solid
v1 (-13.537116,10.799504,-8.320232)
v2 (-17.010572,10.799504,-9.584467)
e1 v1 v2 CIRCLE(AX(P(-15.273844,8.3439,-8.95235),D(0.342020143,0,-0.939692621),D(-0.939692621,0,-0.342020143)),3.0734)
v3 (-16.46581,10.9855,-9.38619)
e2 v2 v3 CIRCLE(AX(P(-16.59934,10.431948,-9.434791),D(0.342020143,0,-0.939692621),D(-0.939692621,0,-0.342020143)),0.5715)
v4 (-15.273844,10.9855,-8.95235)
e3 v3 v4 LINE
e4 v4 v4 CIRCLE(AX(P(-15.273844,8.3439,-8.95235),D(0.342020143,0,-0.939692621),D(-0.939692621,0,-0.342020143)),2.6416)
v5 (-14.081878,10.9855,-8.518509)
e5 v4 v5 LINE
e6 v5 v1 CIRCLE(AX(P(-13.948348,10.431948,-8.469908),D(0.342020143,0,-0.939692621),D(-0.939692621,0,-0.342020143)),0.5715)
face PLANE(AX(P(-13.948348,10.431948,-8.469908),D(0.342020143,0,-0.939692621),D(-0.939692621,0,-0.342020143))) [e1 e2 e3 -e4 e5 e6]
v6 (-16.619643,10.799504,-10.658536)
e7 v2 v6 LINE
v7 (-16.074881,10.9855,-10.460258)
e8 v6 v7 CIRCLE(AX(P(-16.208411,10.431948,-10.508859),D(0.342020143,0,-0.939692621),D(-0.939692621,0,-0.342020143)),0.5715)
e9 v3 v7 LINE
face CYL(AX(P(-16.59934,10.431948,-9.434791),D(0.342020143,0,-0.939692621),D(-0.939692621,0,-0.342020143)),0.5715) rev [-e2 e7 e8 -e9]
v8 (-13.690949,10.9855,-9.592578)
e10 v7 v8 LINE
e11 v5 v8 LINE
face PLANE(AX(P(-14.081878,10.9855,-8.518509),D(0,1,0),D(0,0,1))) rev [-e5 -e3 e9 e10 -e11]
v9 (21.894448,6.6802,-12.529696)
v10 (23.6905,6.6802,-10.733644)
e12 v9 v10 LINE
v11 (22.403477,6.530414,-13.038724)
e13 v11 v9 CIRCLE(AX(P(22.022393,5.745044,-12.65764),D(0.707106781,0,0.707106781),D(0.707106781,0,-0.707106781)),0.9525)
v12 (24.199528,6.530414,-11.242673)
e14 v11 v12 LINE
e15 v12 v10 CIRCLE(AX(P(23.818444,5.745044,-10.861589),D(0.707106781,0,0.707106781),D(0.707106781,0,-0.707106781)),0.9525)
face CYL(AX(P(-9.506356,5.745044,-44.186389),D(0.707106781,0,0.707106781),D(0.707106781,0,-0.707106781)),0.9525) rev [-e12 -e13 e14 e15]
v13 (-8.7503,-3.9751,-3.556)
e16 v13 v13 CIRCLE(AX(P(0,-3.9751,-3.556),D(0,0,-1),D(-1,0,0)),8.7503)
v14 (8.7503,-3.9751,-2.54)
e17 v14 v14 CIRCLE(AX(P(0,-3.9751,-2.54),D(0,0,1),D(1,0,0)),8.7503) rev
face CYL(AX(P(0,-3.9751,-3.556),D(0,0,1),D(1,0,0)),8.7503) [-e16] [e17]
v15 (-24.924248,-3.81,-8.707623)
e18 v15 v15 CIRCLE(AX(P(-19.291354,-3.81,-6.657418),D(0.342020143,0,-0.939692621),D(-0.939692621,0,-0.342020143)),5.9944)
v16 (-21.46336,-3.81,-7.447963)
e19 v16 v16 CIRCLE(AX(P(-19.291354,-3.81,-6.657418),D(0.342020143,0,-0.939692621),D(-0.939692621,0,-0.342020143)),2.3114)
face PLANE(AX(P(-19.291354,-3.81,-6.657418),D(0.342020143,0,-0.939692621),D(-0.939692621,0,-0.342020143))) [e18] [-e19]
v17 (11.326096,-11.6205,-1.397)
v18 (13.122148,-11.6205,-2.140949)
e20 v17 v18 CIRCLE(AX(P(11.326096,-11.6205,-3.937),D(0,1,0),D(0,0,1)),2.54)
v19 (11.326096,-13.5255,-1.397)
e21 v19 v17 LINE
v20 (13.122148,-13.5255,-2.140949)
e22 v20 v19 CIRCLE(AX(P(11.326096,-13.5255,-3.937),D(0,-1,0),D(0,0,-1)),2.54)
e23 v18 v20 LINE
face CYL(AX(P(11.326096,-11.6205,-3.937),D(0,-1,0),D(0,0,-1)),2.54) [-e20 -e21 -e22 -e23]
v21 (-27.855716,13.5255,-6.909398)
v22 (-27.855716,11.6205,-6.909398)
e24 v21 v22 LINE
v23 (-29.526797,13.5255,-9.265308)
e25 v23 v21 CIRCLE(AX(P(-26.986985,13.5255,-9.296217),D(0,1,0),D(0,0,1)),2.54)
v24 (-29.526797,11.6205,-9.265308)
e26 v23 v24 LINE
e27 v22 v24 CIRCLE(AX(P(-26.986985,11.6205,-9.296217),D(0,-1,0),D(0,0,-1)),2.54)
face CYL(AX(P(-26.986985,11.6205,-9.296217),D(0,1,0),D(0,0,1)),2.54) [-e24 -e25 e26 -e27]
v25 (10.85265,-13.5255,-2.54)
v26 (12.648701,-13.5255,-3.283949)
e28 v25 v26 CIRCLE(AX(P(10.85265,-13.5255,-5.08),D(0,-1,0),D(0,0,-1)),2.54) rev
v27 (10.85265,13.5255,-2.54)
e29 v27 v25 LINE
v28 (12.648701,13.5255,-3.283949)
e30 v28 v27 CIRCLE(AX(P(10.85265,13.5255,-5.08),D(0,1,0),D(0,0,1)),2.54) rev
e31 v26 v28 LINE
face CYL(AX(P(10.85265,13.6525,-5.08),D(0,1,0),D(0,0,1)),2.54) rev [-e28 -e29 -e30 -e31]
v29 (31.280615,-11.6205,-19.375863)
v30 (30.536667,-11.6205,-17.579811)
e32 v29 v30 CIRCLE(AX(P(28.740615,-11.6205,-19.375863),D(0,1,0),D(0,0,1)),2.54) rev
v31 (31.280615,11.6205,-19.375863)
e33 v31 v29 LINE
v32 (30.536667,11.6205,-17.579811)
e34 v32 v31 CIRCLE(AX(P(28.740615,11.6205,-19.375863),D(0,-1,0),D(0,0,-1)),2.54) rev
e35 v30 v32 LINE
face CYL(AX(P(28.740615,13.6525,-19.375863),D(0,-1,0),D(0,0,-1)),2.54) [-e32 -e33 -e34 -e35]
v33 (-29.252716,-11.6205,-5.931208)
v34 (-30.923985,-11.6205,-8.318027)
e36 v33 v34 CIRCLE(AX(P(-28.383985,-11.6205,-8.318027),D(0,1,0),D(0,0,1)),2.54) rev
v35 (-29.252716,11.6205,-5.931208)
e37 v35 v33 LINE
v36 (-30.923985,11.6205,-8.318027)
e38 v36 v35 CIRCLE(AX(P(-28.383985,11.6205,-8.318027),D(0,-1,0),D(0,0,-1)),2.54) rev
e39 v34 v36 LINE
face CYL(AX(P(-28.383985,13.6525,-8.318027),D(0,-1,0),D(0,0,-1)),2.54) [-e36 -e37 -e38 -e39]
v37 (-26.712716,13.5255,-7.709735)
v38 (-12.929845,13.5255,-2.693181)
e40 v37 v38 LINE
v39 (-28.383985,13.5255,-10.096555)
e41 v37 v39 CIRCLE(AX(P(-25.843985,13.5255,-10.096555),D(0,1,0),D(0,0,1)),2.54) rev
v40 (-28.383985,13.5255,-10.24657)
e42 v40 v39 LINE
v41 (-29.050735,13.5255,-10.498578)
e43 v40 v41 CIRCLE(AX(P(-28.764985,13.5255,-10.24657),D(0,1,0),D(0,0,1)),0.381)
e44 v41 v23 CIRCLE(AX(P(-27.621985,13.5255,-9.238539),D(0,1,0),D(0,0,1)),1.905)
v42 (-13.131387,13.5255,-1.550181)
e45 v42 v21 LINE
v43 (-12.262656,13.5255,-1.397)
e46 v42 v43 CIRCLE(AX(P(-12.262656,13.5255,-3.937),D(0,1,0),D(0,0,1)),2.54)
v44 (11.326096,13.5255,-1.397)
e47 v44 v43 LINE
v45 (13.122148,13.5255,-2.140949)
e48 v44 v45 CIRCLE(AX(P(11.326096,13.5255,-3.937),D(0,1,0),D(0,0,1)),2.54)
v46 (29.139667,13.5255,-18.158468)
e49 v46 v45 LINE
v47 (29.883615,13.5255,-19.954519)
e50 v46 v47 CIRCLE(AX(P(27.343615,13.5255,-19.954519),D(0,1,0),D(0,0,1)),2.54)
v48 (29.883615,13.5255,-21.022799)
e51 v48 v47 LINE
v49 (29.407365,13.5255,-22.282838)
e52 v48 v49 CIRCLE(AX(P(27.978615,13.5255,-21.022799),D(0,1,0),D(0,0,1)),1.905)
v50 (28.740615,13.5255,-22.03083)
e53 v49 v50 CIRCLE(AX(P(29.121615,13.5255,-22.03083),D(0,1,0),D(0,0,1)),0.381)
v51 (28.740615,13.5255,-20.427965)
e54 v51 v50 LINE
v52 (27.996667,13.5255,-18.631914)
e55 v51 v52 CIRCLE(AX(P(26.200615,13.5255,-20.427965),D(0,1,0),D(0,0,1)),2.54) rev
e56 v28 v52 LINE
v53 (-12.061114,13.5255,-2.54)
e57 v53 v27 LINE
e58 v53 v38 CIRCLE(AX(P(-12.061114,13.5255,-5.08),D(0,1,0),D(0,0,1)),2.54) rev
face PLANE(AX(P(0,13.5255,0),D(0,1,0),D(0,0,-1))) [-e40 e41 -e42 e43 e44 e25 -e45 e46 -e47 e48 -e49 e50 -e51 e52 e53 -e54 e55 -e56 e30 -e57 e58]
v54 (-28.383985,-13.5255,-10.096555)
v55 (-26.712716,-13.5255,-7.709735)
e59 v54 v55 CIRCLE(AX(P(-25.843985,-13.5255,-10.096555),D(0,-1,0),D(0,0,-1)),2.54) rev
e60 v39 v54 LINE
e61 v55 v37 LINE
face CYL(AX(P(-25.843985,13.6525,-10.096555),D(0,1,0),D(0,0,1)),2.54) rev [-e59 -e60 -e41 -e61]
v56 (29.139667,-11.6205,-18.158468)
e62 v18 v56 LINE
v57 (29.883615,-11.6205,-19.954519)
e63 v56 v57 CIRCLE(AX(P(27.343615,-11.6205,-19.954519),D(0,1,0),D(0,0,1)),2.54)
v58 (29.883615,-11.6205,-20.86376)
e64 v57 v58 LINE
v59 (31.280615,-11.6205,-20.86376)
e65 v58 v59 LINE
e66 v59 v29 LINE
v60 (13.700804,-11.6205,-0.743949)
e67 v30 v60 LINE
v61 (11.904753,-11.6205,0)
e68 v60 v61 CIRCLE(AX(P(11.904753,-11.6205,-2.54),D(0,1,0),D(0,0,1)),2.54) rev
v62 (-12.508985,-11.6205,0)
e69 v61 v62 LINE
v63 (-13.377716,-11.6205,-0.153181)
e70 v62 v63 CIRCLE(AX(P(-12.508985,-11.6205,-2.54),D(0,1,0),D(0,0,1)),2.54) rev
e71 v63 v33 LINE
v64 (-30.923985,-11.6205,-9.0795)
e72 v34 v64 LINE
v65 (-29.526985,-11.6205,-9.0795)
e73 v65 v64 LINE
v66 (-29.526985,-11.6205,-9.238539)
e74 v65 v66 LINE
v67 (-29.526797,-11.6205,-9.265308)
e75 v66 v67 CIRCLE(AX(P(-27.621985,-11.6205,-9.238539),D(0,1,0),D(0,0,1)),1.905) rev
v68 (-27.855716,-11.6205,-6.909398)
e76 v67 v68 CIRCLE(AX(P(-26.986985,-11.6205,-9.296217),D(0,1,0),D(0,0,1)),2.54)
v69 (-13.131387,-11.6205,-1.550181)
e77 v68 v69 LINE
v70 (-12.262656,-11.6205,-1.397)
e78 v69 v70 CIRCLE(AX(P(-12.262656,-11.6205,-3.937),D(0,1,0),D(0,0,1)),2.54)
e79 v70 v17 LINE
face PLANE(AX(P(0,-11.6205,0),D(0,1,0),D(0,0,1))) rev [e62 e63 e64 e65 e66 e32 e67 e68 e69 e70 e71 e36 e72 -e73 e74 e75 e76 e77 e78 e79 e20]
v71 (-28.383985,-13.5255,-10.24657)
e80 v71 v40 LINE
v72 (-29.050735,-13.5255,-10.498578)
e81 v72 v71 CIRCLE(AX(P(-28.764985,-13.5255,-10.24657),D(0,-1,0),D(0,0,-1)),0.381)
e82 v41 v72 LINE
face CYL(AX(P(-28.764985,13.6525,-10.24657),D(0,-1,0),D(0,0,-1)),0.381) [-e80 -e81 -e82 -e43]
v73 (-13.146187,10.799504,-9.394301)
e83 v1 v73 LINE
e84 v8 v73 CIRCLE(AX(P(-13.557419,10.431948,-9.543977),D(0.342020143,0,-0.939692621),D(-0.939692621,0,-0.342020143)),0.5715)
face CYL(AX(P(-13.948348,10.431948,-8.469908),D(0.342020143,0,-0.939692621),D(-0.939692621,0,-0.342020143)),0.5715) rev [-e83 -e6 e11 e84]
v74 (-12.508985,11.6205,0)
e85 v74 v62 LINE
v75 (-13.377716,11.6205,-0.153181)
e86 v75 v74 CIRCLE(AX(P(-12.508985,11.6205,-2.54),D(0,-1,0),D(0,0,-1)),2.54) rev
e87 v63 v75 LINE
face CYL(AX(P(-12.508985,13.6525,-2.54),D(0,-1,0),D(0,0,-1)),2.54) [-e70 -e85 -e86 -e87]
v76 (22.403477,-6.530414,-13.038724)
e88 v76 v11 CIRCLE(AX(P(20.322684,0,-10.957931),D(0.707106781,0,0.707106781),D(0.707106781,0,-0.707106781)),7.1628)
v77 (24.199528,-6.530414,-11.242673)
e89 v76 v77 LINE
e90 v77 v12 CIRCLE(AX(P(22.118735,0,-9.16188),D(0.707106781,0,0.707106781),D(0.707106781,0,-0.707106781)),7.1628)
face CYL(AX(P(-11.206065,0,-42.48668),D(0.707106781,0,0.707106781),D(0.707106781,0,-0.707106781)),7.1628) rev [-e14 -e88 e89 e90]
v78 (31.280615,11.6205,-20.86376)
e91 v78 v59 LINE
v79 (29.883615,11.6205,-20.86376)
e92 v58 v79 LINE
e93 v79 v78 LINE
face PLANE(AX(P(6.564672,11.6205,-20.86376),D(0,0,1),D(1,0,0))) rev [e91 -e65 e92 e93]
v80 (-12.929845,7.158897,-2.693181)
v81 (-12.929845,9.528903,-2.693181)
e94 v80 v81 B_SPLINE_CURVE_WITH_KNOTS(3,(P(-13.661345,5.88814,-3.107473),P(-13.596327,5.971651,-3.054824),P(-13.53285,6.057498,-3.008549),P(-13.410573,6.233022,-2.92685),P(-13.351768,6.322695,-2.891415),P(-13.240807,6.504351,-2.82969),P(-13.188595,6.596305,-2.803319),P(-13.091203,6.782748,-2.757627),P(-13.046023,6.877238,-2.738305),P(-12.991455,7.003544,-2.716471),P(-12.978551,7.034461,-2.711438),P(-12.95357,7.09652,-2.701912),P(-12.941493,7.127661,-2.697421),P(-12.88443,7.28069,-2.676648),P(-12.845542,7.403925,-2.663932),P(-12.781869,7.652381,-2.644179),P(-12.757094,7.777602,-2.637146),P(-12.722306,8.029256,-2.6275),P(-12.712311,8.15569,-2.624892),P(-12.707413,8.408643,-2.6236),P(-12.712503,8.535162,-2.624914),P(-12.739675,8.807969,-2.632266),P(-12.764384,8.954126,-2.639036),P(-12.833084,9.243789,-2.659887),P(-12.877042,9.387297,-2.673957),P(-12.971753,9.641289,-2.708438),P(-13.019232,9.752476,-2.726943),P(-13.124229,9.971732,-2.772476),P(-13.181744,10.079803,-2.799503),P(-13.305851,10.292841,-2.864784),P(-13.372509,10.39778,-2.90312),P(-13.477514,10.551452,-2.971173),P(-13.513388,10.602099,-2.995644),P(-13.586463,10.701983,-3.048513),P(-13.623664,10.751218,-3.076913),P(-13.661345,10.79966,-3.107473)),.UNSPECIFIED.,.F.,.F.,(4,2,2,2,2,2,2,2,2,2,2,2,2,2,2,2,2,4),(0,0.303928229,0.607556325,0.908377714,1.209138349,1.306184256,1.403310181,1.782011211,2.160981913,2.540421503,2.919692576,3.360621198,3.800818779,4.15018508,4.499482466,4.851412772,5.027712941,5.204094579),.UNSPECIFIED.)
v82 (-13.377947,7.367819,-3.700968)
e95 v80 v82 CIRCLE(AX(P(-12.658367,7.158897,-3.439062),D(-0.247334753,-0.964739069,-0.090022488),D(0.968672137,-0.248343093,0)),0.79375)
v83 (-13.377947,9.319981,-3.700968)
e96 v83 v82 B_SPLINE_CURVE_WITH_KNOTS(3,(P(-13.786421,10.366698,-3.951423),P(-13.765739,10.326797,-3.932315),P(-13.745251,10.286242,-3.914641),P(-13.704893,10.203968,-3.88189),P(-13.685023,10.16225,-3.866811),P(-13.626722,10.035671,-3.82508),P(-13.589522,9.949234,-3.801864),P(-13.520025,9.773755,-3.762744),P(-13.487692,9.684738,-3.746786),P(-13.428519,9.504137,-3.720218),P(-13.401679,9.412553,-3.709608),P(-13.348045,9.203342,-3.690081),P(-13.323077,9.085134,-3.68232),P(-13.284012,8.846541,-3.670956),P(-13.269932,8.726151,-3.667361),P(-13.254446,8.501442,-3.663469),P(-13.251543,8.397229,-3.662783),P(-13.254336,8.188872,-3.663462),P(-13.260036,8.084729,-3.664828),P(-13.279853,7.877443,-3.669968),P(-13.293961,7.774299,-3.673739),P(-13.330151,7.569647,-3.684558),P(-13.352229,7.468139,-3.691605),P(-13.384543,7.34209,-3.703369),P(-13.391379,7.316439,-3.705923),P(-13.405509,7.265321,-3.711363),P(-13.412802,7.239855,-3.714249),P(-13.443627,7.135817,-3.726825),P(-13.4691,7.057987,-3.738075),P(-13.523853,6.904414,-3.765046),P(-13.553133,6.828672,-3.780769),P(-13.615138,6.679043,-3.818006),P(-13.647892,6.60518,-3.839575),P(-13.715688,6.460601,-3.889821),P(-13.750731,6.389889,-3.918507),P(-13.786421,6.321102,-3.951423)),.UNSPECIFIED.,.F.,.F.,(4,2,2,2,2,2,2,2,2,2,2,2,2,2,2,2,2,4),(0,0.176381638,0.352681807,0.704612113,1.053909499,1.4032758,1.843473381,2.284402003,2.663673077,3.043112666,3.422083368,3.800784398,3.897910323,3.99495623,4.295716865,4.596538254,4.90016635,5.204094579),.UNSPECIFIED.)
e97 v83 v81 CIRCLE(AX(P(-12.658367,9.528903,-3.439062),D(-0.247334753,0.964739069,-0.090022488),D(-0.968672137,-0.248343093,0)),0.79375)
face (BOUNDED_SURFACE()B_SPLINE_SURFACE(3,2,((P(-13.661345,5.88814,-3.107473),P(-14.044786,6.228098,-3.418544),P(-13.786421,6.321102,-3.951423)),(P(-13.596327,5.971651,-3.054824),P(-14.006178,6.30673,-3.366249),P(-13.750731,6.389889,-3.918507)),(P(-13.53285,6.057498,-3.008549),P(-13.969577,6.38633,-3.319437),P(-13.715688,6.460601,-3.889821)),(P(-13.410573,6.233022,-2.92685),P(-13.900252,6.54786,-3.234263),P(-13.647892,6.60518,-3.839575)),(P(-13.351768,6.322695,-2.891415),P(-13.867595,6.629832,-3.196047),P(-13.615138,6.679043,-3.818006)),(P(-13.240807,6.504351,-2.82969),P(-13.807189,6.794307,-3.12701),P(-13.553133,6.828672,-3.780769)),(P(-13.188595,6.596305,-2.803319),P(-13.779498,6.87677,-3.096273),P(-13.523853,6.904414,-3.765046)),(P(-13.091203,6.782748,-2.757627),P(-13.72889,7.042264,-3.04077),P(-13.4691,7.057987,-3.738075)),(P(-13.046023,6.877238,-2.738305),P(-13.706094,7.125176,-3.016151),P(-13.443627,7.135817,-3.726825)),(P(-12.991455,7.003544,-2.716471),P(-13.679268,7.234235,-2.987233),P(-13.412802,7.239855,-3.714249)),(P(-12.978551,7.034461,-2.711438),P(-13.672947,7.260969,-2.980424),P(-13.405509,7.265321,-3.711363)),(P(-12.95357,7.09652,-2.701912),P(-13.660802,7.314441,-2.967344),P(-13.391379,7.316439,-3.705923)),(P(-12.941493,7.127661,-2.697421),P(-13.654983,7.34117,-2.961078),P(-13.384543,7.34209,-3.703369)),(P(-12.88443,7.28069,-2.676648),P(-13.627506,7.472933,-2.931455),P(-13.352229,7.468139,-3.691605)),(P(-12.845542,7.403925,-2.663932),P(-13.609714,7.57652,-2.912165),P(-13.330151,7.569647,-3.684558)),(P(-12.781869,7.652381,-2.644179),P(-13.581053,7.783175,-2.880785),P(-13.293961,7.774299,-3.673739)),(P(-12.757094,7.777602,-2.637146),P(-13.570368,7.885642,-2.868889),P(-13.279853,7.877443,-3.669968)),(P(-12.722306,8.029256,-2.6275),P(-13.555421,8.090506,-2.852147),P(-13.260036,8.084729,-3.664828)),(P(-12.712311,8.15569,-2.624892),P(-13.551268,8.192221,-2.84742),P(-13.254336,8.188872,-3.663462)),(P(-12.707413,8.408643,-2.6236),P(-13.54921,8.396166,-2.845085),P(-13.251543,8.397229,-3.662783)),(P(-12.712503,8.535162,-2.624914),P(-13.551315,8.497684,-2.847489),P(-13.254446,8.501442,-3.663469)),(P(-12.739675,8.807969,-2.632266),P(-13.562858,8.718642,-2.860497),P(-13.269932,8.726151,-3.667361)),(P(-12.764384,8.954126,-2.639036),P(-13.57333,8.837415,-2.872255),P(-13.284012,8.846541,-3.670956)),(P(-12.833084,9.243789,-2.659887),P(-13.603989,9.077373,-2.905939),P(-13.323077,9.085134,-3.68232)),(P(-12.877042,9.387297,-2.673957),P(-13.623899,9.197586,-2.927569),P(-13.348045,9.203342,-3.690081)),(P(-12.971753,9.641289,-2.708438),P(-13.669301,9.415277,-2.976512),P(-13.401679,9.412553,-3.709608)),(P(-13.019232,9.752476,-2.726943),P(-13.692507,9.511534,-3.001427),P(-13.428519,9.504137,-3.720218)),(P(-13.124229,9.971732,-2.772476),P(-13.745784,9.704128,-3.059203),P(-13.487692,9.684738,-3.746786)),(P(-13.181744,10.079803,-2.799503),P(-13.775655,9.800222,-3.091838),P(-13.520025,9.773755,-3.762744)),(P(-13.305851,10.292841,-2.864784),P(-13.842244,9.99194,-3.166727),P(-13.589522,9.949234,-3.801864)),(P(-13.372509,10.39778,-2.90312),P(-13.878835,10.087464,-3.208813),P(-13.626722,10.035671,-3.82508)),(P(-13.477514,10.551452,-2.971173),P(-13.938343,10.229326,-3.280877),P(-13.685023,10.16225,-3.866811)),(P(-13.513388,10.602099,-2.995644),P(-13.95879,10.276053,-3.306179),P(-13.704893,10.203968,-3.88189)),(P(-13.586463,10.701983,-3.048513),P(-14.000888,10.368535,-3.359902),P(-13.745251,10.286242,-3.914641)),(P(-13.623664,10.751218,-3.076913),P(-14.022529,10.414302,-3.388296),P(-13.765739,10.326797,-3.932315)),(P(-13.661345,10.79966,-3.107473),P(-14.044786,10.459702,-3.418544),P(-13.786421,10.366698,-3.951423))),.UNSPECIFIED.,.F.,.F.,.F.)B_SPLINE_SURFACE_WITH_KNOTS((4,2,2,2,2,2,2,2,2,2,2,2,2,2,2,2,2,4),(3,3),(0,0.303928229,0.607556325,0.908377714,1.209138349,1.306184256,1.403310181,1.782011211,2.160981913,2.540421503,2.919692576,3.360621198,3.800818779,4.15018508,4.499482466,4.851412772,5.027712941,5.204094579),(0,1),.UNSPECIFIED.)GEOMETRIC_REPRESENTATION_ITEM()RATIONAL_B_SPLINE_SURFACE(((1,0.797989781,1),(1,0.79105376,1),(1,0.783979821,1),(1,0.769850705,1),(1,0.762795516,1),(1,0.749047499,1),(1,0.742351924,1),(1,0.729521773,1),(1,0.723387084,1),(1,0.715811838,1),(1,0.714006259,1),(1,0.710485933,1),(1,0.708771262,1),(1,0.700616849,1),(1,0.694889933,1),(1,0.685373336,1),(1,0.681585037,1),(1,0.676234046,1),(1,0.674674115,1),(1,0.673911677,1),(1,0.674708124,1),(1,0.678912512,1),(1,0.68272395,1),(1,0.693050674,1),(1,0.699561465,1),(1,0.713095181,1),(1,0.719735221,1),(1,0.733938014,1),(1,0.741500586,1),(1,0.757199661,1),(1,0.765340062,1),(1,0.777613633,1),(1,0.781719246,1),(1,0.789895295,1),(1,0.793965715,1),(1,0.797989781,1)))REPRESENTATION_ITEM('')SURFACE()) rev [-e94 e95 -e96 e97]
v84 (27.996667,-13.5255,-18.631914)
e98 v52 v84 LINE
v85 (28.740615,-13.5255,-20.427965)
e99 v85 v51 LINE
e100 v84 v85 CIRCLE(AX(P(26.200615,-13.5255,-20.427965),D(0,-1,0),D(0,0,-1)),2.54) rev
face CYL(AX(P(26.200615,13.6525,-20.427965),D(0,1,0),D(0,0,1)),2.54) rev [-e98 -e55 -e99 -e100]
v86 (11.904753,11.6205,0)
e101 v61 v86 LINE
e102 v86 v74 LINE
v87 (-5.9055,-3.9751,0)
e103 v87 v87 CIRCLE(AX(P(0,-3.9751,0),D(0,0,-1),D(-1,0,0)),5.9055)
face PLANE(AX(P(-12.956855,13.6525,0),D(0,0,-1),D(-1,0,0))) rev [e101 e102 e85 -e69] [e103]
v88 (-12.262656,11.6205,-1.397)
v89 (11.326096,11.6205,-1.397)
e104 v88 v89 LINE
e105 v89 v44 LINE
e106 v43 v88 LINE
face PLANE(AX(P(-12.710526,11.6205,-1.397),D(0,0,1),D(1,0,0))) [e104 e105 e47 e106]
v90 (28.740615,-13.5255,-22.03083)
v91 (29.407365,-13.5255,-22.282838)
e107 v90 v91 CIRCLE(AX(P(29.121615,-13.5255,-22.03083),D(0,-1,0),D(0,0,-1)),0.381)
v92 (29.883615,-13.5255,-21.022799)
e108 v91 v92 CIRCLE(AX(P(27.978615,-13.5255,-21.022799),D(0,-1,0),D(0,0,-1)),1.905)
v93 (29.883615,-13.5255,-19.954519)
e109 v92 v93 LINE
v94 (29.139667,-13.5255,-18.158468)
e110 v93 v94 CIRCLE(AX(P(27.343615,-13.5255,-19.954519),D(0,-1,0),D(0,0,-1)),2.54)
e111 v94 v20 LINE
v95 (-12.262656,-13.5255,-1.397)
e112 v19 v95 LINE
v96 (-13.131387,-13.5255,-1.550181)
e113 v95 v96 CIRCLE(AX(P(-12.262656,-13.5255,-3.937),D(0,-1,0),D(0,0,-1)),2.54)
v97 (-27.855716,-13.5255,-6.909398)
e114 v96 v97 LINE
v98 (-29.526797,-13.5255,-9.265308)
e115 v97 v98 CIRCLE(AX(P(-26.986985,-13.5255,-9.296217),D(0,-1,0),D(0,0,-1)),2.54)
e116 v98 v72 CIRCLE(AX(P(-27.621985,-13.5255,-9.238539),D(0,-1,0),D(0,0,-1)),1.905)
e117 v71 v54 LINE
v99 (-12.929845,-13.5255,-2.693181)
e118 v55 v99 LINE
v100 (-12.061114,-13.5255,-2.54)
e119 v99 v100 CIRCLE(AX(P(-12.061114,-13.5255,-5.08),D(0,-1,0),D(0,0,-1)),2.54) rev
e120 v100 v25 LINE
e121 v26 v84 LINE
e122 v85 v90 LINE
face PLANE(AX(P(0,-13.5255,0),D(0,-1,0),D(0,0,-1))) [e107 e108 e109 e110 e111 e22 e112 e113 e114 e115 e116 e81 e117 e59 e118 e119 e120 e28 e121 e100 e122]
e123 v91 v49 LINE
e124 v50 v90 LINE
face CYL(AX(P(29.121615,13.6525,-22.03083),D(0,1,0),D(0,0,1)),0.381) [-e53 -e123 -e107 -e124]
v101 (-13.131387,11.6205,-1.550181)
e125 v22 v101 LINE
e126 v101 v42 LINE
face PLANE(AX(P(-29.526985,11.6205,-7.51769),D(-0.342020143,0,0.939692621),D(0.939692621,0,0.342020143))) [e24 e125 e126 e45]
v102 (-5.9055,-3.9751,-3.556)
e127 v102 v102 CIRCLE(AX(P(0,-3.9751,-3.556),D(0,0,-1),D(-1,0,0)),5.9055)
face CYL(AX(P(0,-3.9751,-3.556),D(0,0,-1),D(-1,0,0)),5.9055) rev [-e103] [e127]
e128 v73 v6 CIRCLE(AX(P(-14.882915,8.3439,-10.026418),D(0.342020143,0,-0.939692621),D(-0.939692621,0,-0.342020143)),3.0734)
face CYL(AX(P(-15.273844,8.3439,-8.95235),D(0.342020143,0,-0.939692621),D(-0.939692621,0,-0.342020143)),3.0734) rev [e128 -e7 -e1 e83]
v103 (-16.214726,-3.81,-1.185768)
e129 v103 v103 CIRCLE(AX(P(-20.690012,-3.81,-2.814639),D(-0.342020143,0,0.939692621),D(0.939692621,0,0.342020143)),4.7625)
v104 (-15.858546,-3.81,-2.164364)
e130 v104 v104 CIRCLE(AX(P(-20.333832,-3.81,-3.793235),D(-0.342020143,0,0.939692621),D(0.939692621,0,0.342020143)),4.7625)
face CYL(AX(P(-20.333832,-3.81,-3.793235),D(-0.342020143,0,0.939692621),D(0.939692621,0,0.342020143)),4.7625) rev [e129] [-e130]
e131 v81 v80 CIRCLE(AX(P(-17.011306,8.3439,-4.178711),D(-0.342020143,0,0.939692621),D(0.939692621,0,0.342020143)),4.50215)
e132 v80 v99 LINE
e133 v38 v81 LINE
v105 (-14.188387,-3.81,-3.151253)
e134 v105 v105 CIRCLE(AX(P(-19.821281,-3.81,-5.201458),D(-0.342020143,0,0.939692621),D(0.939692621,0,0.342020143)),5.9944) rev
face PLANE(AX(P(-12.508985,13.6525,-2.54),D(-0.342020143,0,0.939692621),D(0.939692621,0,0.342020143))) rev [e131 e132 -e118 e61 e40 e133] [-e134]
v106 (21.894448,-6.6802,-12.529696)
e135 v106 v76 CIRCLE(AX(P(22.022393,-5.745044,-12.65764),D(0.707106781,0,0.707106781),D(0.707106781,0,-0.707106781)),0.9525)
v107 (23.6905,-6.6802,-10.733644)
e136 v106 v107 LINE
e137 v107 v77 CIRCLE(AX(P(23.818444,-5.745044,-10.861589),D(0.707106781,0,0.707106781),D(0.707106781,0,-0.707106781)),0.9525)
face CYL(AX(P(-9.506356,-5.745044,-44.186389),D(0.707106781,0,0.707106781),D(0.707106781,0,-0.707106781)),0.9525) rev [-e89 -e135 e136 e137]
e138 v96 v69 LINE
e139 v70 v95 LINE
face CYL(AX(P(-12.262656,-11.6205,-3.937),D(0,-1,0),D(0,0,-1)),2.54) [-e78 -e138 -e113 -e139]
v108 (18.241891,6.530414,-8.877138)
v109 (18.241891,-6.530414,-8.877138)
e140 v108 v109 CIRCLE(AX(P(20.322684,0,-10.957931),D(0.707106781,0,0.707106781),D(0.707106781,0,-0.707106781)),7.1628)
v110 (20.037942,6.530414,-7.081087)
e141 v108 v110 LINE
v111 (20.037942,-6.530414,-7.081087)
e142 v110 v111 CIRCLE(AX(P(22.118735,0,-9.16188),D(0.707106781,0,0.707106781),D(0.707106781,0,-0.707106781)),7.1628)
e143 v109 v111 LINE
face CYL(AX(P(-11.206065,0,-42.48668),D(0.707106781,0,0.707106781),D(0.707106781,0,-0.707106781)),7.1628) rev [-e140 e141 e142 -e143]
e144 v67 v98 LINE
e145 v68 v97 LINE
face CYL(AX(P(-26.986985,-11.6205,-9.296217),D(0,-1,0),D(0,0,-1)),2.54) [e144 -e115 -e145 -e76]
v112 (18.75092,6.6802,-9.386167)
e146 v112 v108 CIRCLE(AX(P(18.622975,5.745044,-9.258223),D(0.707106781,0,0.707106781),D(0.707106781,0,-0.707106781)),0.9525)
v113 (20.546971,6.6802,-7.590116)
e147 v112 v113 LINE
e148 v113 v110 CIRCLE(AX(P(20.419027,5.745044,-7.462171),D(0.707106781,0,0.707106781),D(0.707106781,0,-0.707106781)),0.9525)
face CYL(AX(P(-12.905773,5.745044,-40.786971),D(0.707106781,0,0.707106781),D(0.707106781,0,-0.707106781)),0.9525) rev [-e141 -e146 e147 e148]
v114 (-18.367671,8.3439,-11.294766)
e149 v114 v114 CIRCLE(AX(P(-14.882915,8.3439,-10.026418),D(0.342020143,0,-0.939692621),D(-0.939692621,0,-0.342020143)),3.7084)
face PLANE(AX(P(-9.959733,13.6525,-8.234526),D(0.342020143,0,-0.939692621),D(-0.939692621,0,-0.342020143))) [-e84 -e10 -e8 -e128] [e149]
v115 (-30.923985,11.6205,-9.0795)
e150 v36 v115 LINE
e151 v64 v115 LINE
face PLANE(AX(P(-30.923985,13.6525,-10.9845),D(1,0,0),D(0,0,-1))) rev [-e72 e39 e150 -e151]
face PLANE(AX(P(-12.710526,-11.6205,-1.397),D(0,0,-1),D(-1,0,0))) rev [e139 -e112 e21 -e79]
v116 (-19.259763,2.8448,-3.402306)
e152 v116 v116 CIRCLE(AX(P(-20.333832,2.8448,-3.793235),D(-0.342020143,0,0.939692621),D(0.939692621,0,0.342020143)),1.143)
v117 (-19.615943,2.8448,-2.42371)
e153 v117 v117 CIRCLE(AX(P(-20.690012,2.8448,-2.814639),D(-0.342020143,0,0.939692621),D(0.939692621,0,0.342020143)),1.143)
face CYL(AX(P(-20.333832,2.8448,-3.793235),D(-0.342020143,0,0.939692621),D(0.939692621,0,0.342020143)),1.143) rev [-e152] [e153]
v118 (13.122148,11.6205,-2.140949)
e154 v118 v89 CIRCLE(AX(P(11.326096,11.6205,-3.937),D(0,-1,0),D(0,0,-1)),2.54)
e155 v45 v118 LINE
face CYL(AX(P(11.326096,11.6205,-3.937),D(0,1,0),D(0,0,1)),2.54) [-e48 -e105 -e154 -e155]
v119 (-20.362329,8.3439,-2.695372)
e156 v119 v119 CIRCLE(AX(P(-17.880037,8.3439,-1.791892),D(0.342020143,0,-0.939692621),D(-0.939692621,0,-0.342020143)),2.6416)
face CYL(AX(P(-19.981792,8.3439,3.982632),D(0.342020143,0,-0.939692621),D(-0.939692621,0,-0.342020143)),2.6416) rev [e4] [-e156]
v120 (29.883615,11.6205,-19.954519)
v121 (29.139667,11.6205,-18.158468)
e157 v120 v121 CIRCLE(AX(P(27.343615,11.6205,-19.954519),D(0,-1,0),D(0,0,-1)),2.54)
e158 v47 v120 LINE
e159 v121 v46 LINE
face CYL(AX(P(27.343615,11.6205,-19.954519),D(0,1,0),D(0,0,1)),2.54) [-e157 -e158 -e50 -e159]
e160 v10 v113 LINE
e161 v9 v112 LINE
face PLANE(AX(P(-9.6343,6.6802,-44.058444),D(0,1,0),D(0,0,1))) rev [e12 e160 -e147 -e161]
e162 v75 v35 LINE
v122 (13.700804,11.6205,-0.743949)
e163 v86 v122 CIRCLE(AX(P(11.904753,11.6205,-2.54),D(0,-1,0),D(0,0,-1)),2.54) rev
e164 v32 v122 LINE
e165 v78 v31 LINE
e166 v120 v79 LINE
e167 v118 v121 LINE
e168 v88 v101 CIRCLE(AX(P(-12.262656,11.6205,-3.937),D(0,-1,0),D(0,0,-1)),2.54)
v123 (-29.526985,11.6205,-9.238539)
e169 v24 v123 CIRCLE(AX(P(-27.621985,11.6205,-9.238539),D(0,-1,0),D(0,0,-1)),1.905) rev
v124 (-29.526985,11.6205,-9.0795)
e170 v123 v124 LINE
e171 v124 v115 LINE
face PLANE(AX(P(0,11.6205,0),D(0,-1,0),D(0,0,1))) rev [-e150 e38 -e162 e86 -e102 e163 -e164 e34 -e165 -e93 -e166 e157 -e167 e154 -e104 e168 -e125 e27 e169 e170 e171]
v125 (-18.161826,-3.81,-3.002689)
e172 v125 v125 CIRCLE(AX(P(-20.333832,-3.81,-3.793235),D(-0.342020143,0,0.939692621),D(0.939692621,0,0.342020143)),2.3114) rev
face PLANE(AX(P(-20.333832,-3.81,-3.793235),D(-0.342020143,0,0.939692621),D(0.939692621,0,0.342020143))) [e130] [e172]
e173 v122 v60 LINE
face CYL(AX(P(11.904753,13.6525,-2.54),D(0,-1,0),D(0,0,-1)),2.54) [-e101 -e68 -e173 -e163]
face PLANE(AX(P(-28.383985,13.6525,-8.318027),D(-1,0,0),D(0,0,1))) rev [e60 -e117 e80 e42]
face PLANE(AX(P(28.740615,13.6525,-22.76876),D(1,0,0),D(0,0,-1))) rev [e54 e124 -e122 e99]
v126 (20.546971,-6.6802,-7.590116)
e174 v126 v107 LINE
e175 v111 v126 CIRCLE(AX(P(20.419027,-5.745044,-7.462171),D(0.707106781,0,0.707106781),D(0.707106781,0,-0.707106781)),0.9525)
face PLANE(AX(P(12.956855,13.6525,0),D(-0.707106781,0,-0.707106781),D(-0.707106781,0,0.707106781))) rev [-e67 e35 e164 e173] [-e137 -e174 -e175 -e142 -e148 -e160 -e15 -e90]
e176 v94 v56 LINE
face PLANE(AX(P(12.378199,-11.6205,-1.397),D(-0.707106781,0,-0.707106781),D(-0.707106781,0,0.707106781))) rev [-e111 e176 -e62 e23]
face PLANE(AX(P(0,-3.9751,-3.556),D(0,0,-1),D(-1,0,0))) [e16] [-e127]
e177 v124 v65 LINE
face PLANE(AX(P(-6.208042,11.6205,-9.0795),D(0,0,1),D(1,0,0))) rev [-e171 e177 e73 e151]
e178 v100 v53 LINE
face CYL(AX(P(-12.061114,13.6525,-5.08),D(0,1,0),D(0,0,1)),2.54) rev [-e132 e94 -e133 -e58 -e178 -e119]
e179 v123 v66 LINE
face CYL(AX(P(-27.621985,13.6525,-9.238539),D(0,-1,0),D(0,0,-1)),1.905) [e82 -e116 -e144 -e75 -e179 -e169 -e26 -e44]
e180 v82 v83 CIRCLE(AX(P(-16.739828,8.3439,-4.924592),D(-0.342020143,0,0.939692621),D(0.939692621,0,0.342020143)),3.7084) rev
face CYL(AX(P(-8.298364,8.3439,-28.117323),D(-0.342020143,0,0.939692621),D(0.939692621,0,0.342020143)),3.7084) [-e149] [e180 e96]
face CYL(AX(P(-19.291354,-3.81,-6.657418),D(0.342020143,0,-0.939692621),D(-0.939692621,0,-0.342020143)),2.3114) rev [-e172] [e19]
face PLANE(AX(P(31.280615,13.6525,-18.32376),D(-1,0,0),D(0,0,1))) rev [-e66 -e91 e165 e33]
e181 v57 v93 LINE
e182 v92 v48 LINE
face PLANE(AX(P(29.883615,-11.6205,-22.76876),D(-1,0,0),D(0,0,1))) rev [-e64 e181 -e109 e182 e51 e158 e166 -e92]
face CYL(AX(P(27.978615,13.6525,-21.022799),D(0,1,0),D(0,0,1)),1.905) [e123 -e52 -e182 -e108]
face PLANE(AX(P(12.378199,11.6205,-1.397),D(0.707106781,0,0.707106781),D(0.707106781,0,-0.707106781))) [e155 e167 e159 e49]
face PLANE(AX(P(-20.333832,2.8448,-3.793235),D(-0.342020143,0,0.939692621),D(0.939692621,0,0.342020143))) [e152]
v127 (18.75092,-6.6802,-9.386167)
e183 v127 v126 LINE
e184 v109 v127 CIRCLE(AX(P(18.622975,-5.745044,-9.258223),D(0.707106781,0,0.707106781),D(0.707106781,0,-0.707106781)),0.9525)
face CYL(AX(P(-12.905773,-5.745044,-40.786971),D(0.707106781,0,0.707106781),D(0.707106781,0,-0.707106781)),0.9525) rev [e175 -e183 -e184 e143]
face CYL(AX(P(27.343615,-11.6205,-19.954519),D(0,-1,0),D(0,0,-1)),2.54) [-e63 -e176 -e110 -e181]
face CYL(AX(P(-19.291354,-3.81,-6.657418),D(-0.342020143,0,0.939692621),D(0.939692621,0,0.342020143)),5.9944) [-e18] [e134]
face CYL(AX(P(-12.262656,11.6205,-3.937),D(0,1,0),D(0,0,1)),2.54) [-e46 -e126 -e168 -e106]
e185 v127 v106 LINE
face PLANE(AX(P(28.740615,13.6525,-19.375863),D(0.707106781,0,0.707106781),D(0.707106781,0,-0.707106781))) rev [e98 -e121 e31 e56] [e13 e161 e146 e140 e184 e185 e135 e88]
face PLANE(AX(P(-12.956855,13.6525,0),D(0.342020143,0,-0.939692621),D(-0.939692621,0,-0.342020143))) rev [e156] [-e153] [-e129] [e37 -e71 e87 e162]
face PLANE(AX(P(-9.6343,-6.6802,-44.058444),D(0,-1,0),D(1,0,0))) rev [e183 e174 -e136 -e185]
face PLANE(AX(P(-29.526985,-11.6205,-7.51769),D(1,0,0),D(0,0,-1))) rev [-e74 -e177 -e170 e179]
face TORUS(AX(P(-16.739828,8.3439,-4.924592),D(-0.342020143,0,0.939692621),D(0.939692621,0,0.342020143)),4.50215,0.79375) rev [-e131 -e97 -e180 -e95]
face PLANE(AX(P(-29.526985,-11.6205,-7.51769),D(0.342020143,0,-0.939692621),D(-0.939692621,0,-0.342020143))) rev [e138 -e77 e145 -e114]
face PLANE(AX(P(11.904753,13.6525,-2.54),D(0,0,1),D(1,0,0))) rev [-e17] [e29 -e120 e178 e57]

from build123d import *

# Parameters (mm, degrees)
BOSS_EXTRUDE1_DEPTH     = 13.6525
CUT_EXTRUDE1_DEPTH      = 2.032
CUT_EXTRUDE9_DEPTH      = 0.127
FILLET3_R               = 2.54
FILLET4_R               = 2.54
SKETCH5_W               = 1.905
SKETCH5_H               = 23.241
CUT_EXTRUDE4_DEPTH      = 1.397
SKETCH6_W               = 1.905
SKETCH6_H               = 23.241
CUT_EXTRUDE5_DEPTH      = 1.397
SKETCH32_R              = 5.9944
BOSS_EXTRUDE4_DEPTH     = 1.5494
F_12_28_TAPPED_HOLE1_D  = 4.6228
SKETCH33_R              = 4.7625
SKETCH33_R_2            = 1.143
CUT_EXTRUDE16_DEPTH     = 1.0414
SKETCH34_R              = 8.7503
BOSS_EXTRUDE5_DEPTH     = 1.016
F_1_2_28_TAPPED_HOLE2_D = 11.811
CUT_EXTRUDE10_DEPTH     = 50.368791583
SKETCH27_R              = 3.7084
BOSS_EXTRUDE3_DEPTH     = 6.223
CUT_EXTRUDE13_DEPTH     = 1.143
SKETCH31_R              = 2.6416
CUT_EXTRUDE15_DEPTH     = 40.985274843
FILLET5_R               = 0.79375
FILLET6_R               = 1.905
FILLET7_R               = 0.381


with BuildPart() as part:
    # Sketch1 → Boss-Extrude1 (new, symmetric)
    with BuildSketch(Plane(origin=(0, 0, 0), x_dir=(1, 0, 0), z_dir=(0, 1, 0))):
        Polygon((-12.956855136, 0), (12.956855136, 0), (31.280615395, 18.323760259), (31.280615395, 22.768760259), (28.740615395, 22.768760259), (28.740615395, 19.375862707), (11.904752688, 2.54), (-12.508984605, 2.54), (-28.383984605, 8.318027469), (-28.383984605, 10.984500322), (-30.923984605, 10.984500322), (-30.923984605, 6.539500322), align=None)
    extrude(amount=BOSS_EXTRUDE1_DEPTH, both=True)

    # Sketch2 → Cut-Extrude1 (cut)
    with BuildSketch(Plane.XZ.offset(13.6525)):
        Polygon((12.378198789, -1.397), (29.883615395, -18.902416606), (29.883615395, -22.768760259), (31.280615395, -22.768760259), (31.280615395, -18.323760259), (12.956855136, 0), (-12.956855136, 0), (-30.923984605, -6.539500322), (-30.923984605, -10.984500322), (-29.526984605, -10.984500322), (-29.526984605, -7.517690253), (-12.710526344, -1.397), align=None)
    cut_extrude1 = extrude(amount=-CUT_EXTRUDE1_DEPTH, mode=Mode.SUBTRACT)

    # Sketch17 → Cut-Extrude9 (cut)
    with BuildSketch(Plane.XZ.offset(13.6525)):
        Polygon((28.740615395, -22.768760259), (29.883615395, -22.768760259), (29.883615395, -18.902416606), (12.378198789, -1.397), (-12.710526344, -1.397), (-29.526984605, -7.517690253), (-29.526984605, -10.984500322), (-28.383984605, -10.984500322), (-28.383984605, -8.318027469), (-12.508984605, -2.54), (11.904752688, -2.54), (28.740615395, -19.375862707), align=None)
    cut_extrude9 = extrude(amount=-CUT_EXTRUDE9_DEPTH, mode=Mode.SUBTRACT)

    # Mirror1: Cut-Extrude1, Cut-Extrude9 across plane
    add(cut_extrude1.mirror(Plane.ZX), mode=Mode.SUBTRACT)
    add(cut_extrude9.mirror(Plane.ZX), mode=Mode.SUBTRACT)

    # Fillet3
    fillet3_edges = [part.edges().sort_by_distance(p)[0] for p in [
        (-30.923984605, 0, -6.539500322),
        (31.280615395, 0, -18.323760259),
        (12.956855136, 0, 0),
        (-12.956855136, 0, 0),
        (-29.526984605, 12.573, -7.517690253),
        (-12.710526344, 12.573, -1.397),
        (12.378198789, 12.573, -1.397),
        (29.883615395, 12.573, -18.902416606),
        (29.883615395, -12.573, -18.902416606),
        (12.378198789, -12.573, -1.397),
        (-12.710526344, -12.573, -1.397),
        (-29.526984605, -12.573, -7.517690253),
    ]]
    fillet(fillet3_edges, radius=FILLET3_R)

    # Fillet4
    fillet4_edges = [part.edges().sort_by_distance(p)[0] for p in [
        (-28.383984605, 0, -8.318027469),
        (-12.508984605, 0, -2.54),
        (11.904752688, 0, -2.54),
        (28.740615395, 0, -19.375862707),
    ]]
    fillet(fillet4_edges, radius=FILLET4_R)

    # Sketch5 → Cut-Extrude4 (cut)
    with BuildSketch(Plane(origin=(31.280615395, 0, 0), x_dir=(0, 0, -1), z_dir=(1, 0, 0))):
        with Locations((21.816260259, 0)):
            Rectangle(SKETCH5_W, SKETCH5_H)
    extrude(amount=-CUT_EXTRUDE4_DEPTH, mode=Mode.SUBTRACT)

    # Sketch6 → Cut-Extrude5 (cut)
    with BuildSketch(Plane.ZY.offset(30.923984605)):
        with Locations((-10.032000322, 0)):
            Rectangle(SKETCH6_W, SKETCH6_H)
    extrude(amount=-CUT_EXTRUDE5_DEPTH, mode=Mode.SUBTRACT)

    # Sketch32 → Boss-Extrude4 (add)
    with BuildSketch(Plane(origin=(-0.646932965, 0, 1.777433714), x_dir=(-0.9396926207859079, 0, -0.3420201433256701), z_dir=(0.3420201433256701, 0, -0.9396926207859079))):
        with Locations(Location((20.404914452, -3.81, 0), (0, 0, 180))):
            Circle(SKETCH32_R)
    extrude(amount=BOSS_EXTRUDE4_DEPTH)

    # #12-28 Tapped Hole1 (through all)
    with Locations(Plane(origin=(-0.117006955, 0, 0.321473968), x_dir=(0.9396926207859079, 0, 0.3420201433256701), z_dir=(0.3420201433256701, 0, -0.9396926207859079))):
        with Locations((-20.404914452, 3.81)):
            Hole(F_12_28_TAPPED_HOLE1_D / 2)

    # Sketch33 → Cut-Extrude16 (cut)
    with BuildSketch(Plane(origin=(-1.515664129, 0, 4.164252971), x_dir=(0.9396926207859079, 0, 0.34202014332567005), z_dir=(-0.34202014332567005, 0, 0.9396926207859079))):
        with Locations((-20.404914452, -3.81)):
            Circle(SKETCH33_R)
        with Locations((-20.404914452, 2.8448)):
            Circle(SKETCH33_R_2)
    extrude(amount=-CUT_EXTRUDE16_DEPTH, mode=Mode.SUBTRACT)

    # Sketch34 → Boss-Extrude5 (add)
    with BuildSketch(Plane(origin=(0, 0, -2.54), x_dir=(-1, 0, 0), z_dir=(0, 0, -1))):
        with Locations(Location((0, -3.9751, 0), (0, 0, 180))):
            Circle(SKETCH34_R)
    extrude(amount=BOSS_EXTRUDE5_DEPTH)

    # 1/2-28 Tapped Hole2 (through all)
    with Locations(Plane(origin=(0, 0, -3.556), x_dir=(1, 0, 0), z_dir=(0, 0, -1))):
        with Locations((0, 3.9751)):
            Hole(F_1_2_28_TAPPED_HOLE2_D / 2)

    # Sketch22 → Cut-Extrude10 (cut, through all)
    with BuildSketch(Plane(origin=(6.478427568, 0, 6.478427568), x_dir=(0.7071067811865479, 0, -0.7071067811865472), z_dir=(0.7071067811865472, 0, 0.7071067811865479))):
        with BuildLine():
            Line((24.341545605, 6.6802), (19.895924926, 6.6802))
            ThreePointArc((19.895924926, 6.6802), (19.52095099, 6.677571434), (19.176049558, 6.53041382))
            ThreePointArc((19.176049558, 6.53041382), (14.955935265, 0), (19.176049558, -6.53041382))
            ThreePointArc((19.176049558, -6.53041382), (19.52095099, -6.677571434), (19.895924926, -6.6802))
            Line((19.895924926, -6.6802), (24.341545605, -6.6802))
            ThreePointArc((24.341545605, -6.6802), (24.716519541, -6.677571434), (25.061420973, -6.53041382))
            ThreePointArc((25.061420973, -6.53041382), (29.281535265, 0), (25.061420973, 6.53041382))
            ThreePointArc((25.061420973, 6.53041382), (24.716519541, 6.677571434), (24.341545605, 6.6802))
        make_face()
    extrude(amount=-CUT_EXTRUDE10_DEPTH, mode=Mode.SUBTRACT)

    # Sketch27 → Boss-Extrude3 (add)
    with BuildSketch(Plane(origin=(-0.646932965, 0, 1.777433714), x_dir=(-0.9396926207859079, 0, -0.3420201433256701), z_dir=(0.3420201433256701, 0, -0.9396926207859079))):
        with Locations(Location((17.414602222, 8.3439, 0), (0, 0, 180))):
            Circle(SKETCH27_R)
    extrude(amount=BOSS_EXTRUDE3_DEPTH)

    # Sketch30 → Cut-Extrude13 (cut)
    with BuildSketch(Plane(origin=(1.481458387, 0, -4.070273465), x_dir=(-0.9396926207859079, 0, -0.34202014332567005), z_dir=(0.34202014332567005, 0, -0.9396926207859079))):
        with BuildLine():
            Line((16.146138227, 10.9855), (18.683066217, 10.9855))
            ThreePointArc((18.683066217, 10.9855), (18.999757633, 10.976126048), (19.2627898, 10.799503844))
            ThreePointArc((19.2627898, 10.799503844), (17.414602222, 5.2705), (15.566414644, 10.799503844))
            ThreePointArc((15.566414644, 10.799503844), (15.829446811, 10.976126048), (16.146138227, 10.9855))
        make_face()
    extrude(amount=-CUT_EXTRUDE13_DEPTH, mode=Mode.SUBTRACT)

    # Sketch31 → Cut-Extrude15 (cut, through all)
    with BuildSketch(Plane(origin=(1.090529363, 0, -2.996204799), x_dir=(-0.9396926207859079, 0, -0.34202014332567005), z_dir=(0.34202014332567005, 0, -0.9396926207859079))):
        with Locations((17.414602222, 8.3439)):
            Circle(SKETCH31_R)
    extrude(amount=-CUT_EXTRUDE15_DEPTH, mode=Mode.SUBTRACT)

    # Fillet5
    fillet5_edges = [part.edges().sort_by_distance(p)[0] for p in [
        (-20.496062282, 8.3439, -5.447058533),
    ]]
    fillet(fillet5_edges, radius=FILLET5_R)

    # Fillet6
    # the kernel refuses this fillet: 1.905 mm, written as the material it takes off along each edge
    with BuildSketch(Plane(origin=(29.883615395, 17.890403349, -22.768760259), x_dir=(-1.0, 0, 7.382060356189012e-12), z_dir=(0, -1, 0)), Plane(origin=(-29.526984605, -17.890403349, -10.984500322), x_dir=(1.0, 0, 7.405372125734756e-12), z_dir=(0, 1, 0))) as fillet6_piece_1:
        with BuildLine():
            CenterArc((1.905, -1.74596134), FILLET6_R, 113.578178479, 66.421821522)
            Line((0, -1.74596134), (-0.0381, -1.74596134))
            Line((-0.0381, -1.74596134), (-0.0381, 0))
            Line((-0.0381, 0), (0, 0.0381))
            ThreePointArc((0, 0.0381), (0.5715, 0.0381), (1.12776, 0.034919227))
            Line((1.12776, 0.034919227), (1.143, 0))
        make_face()
    extrude(amount=35.780806699, mode=Mode.SUBTRACT)

    # Fillet7
    fillet7_edges = [part.edges().sort_by_distance(p)[0] for p in [
        (-28.383984605, 0, -10.984500322),
        (28.740615395, 0, -22.768760259),
    ]]
    fillet(fillet7_edges, radius=FILLET7_R)


solid = part.part
